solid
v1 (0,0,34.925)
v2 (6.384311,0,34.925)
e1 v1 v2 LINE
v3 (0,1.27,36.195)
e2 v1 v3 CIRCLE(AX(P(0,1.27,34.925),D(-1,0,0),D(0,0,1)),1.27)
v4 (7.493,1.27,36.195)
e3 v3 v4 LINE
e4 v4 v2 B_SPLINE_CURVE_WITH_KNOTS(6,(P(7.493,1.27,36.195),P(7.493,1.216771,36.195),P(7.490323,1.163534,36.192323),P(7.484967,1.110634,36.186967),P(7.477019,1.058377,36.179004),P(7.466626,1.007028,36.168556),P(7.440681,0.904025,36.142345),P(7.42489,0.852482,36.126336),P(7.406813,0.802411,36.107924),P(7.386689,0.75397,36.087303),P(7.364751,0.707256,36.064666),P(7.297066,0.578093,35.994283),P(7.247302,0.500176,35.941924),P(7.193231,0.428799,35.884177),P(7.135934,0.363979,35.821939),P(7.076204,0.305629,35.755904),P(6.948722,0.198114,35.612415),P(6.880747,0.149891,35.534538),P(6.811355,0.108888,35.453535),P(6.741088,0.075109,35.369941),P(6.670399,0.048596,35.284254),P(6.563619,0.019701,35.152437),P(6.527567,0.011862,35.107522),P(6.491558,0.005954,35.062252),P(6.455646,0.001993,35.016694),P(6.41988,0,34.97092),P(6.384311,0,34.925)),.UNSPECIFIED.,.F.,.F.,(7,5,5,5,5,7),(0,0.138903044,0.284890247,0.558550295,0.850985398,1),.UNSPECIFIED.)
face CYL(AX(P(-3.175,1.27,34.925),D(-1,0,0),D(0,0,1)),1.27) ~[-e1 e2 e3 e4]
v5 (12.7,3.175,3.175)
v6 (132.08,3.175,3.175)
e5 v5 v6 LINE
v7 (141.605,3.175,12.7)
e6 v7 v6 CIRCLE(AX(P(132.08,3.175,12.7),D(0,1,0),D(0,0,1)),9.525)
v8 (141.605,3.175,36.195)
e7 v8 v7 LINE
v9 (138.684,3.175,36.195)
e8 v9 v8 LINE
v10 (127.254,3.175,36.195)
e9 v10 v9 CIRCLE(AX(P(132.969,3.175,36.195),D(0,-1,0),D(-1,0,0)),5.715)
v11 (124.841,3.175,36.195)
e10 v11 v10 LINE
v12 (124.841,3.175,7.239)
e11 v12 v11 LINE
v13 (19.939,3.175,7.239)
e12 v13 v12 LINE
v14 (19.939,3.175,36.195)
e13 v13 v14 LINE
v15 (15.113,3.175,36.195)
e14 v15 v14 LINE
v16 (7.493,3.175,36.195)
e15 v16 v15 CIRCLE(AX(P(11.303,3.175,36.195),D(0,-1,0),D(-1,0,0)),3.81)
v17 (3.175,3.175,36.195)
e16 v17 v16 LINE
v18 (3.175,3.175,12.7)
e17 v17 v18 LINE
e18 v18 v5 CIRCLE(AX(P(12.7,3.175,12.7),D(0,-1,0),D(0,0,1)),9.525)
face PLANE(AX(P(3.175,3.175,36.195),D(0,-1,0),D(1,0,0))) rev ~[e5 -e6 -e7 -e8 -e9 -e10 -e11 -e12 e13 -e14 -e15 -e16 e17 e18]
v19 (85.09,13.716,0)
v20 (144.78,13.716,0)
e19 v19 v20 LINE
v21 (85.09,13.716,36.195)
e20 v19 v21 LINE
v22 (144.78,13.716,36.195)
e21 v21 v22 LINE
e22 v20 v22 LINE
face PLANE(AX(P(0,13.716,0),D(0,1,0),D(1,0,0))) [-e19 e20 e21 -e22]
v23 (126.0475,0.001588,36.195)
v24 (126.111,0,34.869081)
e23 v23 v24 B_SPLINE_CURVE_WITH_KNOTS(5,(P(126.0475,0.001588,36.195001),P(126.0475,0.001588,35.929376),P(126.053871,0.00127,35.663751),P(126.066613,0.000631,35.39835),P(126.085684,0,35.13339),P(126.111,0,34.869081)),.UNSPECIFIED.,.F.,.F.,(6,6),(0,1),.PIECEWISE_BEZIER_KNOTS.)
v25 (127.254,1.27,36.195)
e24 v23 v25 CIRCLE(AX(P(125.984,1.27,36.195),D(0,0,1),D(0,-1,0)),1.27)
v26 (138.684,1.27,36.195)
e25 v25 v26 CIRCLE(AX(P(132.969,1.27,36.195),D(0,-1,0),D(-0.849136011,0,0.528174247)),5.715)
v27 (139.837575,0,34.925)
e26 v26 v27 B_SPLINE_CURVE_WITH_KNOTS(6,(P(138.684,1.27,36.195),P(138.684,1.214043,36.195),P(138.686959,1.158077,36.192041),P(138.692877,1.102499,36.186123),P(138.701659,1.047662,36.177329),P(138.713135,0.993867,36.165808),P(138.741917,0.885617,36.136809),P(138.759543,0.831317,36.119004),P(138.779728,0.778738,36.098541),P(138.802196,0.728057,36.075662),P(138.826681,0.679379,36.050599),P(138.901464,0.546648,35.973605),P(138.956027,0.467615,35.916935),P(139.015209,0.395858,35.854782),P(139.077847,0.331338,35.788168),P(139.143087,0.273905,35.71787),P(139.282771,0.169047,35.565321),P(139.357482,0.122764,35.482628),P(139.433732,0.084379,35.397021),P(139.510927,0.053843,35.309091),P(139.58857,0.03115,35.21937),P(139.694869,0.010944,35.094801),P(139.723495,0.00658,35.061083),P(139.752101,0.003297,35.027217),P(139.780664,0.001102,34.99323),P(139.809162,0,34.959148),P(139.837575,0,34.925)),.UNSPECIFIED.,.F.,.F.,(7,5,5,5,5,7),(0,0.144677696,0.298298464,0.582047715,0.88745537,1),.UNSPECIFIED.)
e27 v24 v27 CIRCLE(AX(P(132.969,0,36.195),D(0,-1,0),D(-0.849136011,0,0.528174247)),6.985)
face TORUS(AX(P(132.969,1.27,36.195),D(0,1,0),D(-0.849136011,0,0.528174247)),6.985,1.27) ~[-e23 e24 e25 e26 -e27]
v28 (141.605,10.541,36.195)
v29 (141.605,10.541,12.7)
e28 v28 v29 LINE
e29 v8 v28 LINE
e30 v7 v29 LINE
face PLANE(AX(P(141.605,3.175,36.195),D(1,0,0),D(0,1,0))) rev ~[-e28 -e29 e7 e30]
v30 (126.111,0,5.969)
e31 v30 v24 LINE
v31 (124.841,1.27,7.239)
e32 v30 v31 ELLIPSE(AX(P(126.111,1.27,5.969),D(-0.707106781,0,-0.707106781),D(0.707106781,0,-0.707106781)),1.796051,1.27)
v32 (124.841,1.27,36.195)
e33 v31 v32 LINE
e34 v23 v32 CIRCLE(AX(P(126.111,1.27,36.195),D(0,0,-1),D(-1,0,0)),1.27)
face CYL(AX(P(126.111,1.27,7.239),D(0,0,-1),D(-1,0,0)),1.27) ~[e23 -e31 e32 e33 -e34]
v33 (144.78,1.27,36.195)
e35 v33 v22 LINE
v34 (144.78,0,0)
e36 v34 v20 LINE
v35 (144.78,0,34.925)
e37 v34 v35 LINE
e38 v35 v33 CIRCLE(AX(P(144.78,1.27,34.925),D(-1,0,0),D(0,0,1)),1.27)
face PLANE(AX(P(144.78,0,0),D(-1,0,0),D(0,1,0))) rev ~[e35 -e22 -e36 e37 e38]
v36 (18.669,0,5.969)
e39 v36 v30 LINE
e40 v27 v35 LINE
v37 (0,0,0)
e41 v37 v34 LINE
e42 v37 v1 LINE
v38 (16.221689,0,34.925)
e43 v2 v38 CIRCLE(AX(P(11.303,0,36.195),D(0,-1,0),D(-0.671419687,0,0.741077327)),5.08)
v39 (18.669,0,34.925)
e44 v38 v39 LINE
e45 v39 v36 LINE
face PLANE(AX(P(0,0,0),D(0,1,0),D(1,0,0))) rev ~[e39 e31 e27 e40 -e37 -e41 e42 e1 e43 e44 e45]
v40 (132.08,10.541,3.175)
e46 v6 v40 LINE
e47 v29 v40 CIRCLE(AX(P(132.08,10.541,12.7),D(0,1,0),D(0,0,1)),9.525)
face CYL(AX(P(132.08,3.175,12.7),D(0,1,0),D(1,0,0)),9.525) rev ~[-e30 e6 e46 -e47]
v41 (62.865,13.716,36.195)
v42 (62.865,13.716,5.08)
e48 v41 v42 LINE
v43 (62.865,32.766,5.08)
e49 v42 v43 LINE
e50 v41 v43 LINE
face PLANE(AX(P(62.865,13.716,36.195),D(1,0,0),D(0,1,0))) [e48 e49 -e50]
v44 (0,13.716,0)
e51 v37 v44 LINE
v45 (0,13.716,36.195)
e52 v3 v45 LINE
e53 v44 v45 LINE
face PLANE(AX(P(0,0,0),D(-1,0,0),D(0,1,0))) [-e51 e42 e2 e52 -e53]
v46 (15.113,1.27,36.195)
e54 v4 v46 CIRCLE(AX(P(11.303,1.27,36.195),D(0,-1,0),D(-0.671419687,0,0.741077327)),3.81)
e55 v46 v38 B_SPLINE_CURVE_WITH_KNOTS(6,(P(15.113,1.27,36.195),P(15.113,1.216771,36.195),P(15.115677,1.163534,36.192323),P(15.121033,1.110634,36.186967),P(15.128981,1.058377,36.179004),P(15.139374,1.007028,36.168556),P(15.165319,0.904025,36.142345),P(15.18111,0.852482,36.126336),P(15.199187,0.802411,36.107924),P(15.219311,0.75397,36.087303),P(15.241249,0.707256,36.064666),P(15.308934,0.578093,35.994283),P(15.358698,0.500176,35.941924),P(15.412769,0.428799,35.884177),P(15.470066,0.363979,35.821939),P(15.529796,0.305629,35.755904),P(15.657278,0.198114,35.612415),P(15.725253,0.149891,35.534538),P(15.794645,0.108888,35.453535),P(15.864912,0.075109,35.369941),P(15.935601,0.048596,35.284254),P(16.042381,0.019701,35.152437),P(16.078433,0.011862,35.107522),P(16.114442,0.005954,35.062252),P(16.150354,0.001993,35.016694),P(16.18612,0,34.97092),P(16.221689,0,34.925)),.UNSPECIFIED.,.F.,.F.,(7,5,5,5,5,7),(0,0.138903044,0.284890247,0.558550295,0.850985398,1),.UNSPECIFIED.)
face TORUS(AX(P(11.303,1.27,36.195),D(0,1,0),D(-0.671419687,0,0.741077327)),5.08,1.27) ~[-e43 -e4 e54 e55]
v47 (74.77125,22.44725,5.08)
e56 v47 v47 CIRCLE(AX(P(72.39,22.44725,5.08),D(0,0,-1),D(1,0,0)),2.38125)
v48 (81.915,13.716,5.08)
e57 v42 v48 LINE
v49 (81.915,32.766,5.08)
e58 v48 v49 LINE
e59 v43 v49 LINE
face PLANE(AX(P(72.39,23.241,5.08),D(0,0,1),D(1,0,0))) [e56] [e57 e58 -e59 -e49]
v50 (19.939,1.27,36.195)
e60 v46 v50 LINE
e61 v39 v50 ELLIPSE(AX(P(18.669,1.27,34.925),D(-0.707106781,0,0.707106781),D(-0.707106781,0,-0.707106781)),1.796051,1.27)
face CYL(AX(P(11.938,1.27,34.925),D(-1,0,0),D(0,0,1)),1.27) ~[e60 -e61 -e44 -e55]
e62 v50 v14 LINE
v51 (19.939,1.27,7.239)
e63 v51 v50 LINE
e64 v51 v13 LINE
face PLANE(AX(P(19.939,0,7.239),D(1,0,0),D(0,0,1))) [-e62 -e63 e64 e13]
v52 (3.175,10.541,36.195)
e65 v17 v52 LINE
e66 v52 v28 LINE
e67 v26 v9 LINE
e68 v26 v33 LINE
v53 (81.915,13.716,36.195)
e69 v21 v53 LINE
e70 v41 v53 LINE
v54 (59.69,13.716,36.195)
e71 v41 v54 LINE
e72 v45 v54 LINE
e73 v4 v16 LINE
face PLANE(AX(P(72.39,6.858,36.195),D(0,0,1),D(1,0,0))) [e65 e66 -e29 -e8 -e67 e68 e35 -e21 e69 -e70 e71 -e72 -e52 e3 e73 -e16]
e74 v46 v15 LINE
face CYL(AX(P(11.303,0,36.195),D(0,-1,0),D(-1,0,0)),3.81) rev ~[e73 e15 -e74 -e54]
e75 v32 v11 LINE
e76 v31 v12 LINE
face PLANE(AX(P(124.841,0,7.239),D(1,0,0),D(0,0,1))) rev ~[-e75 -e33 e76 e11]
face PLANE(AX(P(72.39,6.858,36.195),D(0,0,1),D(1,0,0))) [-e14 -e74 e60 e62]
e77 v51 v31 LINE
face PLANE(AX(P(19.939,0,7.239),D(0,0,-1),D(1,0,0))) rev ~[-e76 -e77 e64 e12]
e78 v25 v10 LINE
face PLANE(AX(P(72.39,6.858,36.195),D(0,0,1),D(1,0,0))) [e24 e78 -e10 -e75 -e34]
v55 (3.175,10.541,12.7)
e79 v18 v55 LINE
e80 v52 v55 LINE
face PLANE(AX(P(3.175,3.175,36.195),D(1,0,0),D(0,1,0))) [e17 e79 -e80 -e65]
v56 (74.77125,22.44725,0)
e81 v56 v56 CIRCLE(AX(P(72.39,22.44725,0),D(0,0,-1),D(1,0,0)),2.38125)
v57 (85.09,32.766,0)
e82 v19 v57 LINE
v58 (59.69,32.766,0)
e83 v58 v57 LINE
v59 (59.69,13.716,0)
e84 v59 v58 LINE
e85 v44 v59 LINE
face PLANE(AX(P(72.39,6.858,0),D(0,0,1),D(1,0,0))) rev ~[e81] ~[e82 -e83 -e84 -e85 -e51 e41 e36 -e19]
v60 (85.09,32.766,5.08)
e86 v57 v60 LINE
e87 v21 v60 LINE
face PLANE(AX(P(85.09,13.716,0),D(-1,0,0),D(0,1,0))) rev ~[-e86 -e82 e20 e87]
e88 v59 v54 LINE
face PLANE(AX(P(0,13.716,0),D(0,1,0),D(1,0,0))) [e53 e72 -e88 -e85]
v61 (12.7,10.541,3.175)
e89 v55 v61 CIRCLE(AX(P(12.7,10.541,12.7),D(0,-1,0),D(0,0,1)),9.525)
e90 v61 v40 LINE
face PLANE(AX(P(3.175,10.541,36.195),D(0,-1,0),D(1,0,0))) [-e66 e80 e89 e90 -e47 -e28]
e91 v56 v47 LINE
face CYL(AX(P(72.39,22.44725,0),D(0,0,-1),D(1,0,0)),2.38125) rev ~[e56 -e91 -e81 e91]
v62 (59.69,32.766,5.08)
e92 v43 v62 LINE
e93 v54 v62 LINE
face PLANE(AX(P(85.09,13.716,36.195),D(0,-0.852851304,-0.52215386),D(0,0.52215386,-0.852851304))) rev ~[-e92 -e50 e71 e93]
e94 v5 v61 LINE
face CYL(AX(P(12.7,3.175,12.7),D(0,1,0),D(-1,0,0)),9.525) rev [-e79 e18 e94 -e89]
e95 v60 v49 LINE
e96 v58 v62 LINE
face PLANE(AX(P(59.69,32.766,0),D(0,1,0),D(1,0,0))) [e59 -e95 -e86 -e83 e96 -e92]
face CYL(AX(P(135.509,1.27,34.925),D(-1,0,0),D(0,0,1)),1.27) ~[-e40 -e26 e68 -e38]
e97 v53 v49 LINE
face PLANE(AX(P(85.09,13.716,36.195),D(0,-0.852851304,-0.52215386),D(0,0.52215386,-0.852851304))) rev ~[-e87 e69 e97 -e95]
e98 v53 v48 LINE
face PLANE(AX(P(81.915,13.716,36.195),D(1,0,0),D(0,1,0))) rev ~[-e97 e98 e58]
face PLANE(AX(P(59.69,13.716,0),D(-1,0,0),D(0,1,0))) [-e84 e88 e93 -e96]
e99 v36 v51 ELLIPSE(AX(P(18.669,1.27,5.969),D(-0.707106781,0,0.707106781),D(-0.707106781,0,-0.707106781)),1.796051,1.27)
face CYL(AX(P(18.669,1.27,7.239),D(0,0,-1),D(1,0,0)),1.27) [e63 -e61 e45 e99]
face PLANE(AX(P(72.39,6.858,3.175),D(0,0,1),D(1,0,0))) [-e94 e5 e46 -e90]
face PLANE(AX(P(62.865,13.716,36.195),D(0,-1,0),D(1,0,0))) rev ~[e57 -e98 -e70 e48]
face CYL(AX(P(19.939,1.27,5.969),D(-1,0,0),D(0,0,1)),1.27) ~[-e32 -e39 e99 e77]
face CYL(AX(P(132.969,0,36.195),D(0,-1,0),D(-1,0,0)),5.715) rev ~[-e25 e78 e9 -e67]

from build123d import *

# Parameters (mm, degrees)
F0_W          = 144.78
F0_H          = 13.716
F1_DEPTH      = 36.195
F2_W          = 138.43
F2_H          = 7.366
F3_DEPTH      = 33.02
F4_W          = 104.902
F4_H          = 28.956
F5_DEPTH      = 3.175
F6_W          = 25.4
F6_H          = 19.05
F7_DEPTH      = 36.195
F8_W          = 19.05
F8_H          = 19.05
F9_DEPTH      = 31.115
F11_DEPTH     = 25.4
F12_R         = 2.38125
F13_DEPTH     = 25.4
F14_R         = 9.525
F15_T1_DEPTH  = 104.902
F15_T3_DEPTH  = 13.843
F15_T5_DEPTH  = 11.176
F15_T7_DEPTH  = 12.446
F15_T9_DEPTH  = 32.131
F15_T12_ANGLE = 243.7643577336
F15_T14_ANGLE = 275.6465366004
F15_T19_DEPTH = 108.077
F15_T23_DEPTH = 32.131
F15_T30_DEPTH = 32.131
F15_T34_DEPTH = 108.077


# Not quite as in the source:
# - a fillet or chamfer that OpenCascade refuses, or shapes differently, is made with other operations: its cross-section is extruded or revolved along the edge and cut away or added


with BuildPart() as f1:
    # F0 (on Top) → F1 (new body)
    with BuildSketch(Plane.XY):
        with Locations((72.39, 6.858)):
            Rectangle(F0_W, F0_H)
    extrude(amount=F1_DEPTH)

    # F2 (on face) → F3 (cut)
    with BuildSketch(Plane.XY.offset(36.195)):
        with Locations((72.39, 6.858)):
            Rectangle(F2_W, F2_H)
    extrude(amount=-F3_DEPTH, mode=Mode.SUBTRACT)

    # F4 (on face) → F5 (cut)
    with BuildSketch(Plane.XZ):
        with BuildLine():
            ThreePointArc((7.493, 36.195), (11.303, 32.385), (15.113, 36.195))
            Line((15.113, 36.195), (7.493, 36.195))
        make_face()
        with Locations((72.39, 21.717)):
            Rectangle(F4_W, F4_H)
        with BuildLine():
            Line((138.684, 36.195), (127.254, 36.195))
            ThreePointArc((127.254, 36.195), (132.969, 30.48), (138.684, 36.195))
        make_face()
    extrude(amount=-F5_DEPTH, mode=Mode.SUBTRACT)

    # F6 (on Top) → F7 (join)
    with BuildSketch(Plane.XY):
        with Locations((72.39, 23.241)):
            Rectangle(F6_W, F6_H)
    extrude(amount=F7_DEPTH)

    # F8 (on face) → F9 (cut)
    with BuildSketch(Plane.XY.offset(36.195)):
        with Locations((72.39, 23.241)):
            Rectangle(F8_W, F8_H)
    extrude(amount=-F9_DEPTH, mode=Mode.SUBTRACT)

    # F10 (on face) → F11 (cut)
    with BuildSketch(Plane.YZ.offset(85.09)):
        Polygon((32.766, 36.195), (13.716, 36.195), (32.766, 5.08), align=None)
    extrude(amount=-F11_DEPTH, mode=Mode.SUBTRACT)

    # F12 (on face) → F13 (cut)
    with BuildSketch(Plane(origin=(0, 0, 0), x_dir=(1, 0, 0), z_dir=(0, 0, -1))):
        with Locations((72.39, -22.44725)):
            Circle(F12_R)
    extrude(amount=-F13_DEPTH, mode=Mode.SUBTRACT)

    # F14
    f14_edges = [f1.edges().sort_by_distance(p)[0] for p in [
        (141.605, 6.858, 3.175),
        (3.175, 6.858, 3.175),
    ]]
    fillet(f14_edges, radius=F14_R)

    # F15: fillet of radius 1.27 on 9 edges, made by hand

    # F15_s2 → F15_t1 (cut)
    with BuildSketch(Plane.YZ.offset(19.939)):
        with BuildLine():
            ThreePointArc((1.27, 7.239), (0.3719743879, 6.8670256121), (0, 5.969))
            Line((0, 5.969), (0, 7.239))
            Line((0, 7.239), (1.27, 7.239))
        make_face()
    extrude(amount=F15_T1_DEPTH, mode=Mode.SUBTRACT)

    # F15_s4 → F15_t3 (cut)
    with BuildSketch(Plane.YZ.offset(-3.175)):
        with BuildLine():
            ThreePointArc((1.27, 36.195), (0.3719743879, 35.8230256121), (0, 34.925))
            Line((0, 34.925), (0, 36.195))
            Line((0, 36.195), (1.27, 36.195))
        make_face()
    extrude(amount=F15_T3_DEPTH, mode=Mode.SUBTRACT)

    # F15_s6 → F15_t5 (cut)
    with BuildSketch(Plane.YZ.offset(11.938)):
        with BuildLine():
            ThreePointArc((1.27, 36.195), (0.3719743879, 35.8230256121), (0, 34.925))
            Line((0, 34.925), (0, 36.195))
            Line((0, 36.195), (1.27, 36.195))
        make_face()
    extrude(amount=F15_T5_DEPTH, mode=Mode.SUBTRACT)

    # F15_s8 → F15_t7 (cut)
    with BuildSketch(Plane.YZ.offset(135.509)):
        with BuildLine():
            ThreePointArc((1.27, 36.195), (0.3719743879, 35.8230256121), (0, 34.925))
            Line((0, 34.925), (0, 36.195))
            Line((0, 36.195), (1.27, 36.195))
        make_face()
    extrude(amount=F15_T7_DEPTH, mode=Mode.SUBTRACT)

    # F15_s10 → F15_t9 (cut)
    with BuildSketch(Plane.XY.offset(7.239)):
        with BuildLine():
            ThreePointArc((19.939, 1.27), (19.5670256121, 0.3719743879), (18.669, 0))
            Line((18.669, 0), (19.939, 0))
            Line((19.939, 0), (19.939, 1.27))
        make_face()
        with BuildLine():
            ThreePointArc((124.841, 1.27), (125.2129743879, 0.3719743879), (126.111, 0))
            Line((126.111, 0), (124.841, 0))
            Line((124.841, 0), (124.841, 1.27))
        make_face()
    extrude(amount=F15_T9_DEPTH, mode=Mode.SUBTRACT)

    # F15_s11 → F15_t12 (revolve, cut)
    with BuildSketch(Plane(origin=(53.3272604269, 0, 85.7332545483), x_dir=(0, 1, 0), z_dir=(0.5281742472, 0, 0.8491360107))):
        with BuildLine():
            ThreePointArc((1.27, -88.0764993266), (0.3719743879, -87.7045249387), (0, -86.8064993266))
            Line((0, -86.8064993266), (0, -88.0764993266))
            Line((0, -88.0764993266), (1.27, -88.0764993266))
        make_face()
    revolve(axis=Axis((132.969, 0, 36.195), (0, -1, 0)), revolution_arc=F15_T12_ANGLE, mode=Mode.SUBTRACT)

    # F15_s13 → F15_t14 (revolve, cut)
    with BuildSketch(Plane(origin=(24.217245462, 0, 21.9409429798), x_dir=(0, 1, 0), z_dir=(0.7410773266, 0, 0.6714196869))):
        with BuildLine():
            ThreePointArc((1.27, 23.0442371148), (0.3719743879, 23.4162115027), (0, 24.3142371148))
            Line((0, 24.3142371148), (0, 23.0442371148))
            Line((0, 23.0442371148), (1.27, 23.0442371148))
        make_face()
    revolve(axis=Axis((11.303, 0, 36.195), (0, -1, 0)), revolution_arc=F15_T14_ANGLE, mode=Mode.SUBTRACT)


with BuildPart() as f15_tool17:
    # F15_s18 → F15_t19 (new body)
    with BuildSketch(Plane.YZ.offset(16.764)):
        with BuildLine():
            ThreePointArc((1.27, 7.239), (0.3719743879, 6.8670256121), (0, 5.969))
            Line((0, 5.969), (0, 7.239))
            Line((0, 7.239), (1.27, 7.239))
        make_face()
    extrude(amount=F15_T19_DEPTH)

    split(bisect_by=Plane.YZ.offset(19.939), keep=Keep.BOTTOM)


with BuildPart() as f15_tool21:
    # F15_s22 → F15_t23 (new body)
    with BuildSketch(Plane.XY.offset(36.195)):
        with BuildLine():
            ThreePointArc((19.939, 1.27), (19.5670256121, 0.3719743879), (18.669, 0))
            Line((18.669, 0), (19.939, 0))
            Line((19.939, 0), (19.939, 1.27))
        make_face()
    extrude(amount=-F15_T23_DEPTH)

    split(bisect_by=Plane.XY.offset(7.239), keep=Keep.BOTTOM)


with BuildPart() as f15_tool17_1:
    add(f15_tool17.part)

    # F15_t25: intersect F15_tool21
    add(f15_tool21.part, mode=Mode.INTERSECT)


with BuildPart() as f1_1:
    add(f1.part)

    # F15_t15: cut F15_tool17
    add(f15_tool17_1.part, mode=Mode.SUBTRACT)


with BuildPart() as f15_tool28:
    # F15_s29 → F15_t30 (new body)
    with BuildSketch(Plane.XY.offset(4.064)):
        with BuildLine():
            ThreePointArc((124.841, 1.27), (125.2129743879, 0.3719743879), (126.111, 0))
            Line((126.111, 0), (124.841, 0))
            Line((124.841, 0), (124.841, 1.27))
        make_face()
    extrude(amount=F15_T30_DEPTH)

    split(bisect_by=Plane.XY.offset(7.239), keep=Keep.BOTTOM)


with BuildPart() as f15_tool32:
    # F15_s33 → F15_t34 (new body)
    with BuildSketch(Plane.YZ.offset(19.939)):
        with BuildLine():
            ThreePointArc((1.27, 7.239), (0.3719743879, 6.8670256121), (0, 5.969))
            Line((0, 5.969), (0, 7.239))
            Line((0, 7.239), (1.27, 7.239))
        make_face()
    extrude(amount=F15_T34_DEPTH)

    split(bisect_by=Plane.YZ.offset(124.841), keep=Keep.TOP)


with BuildPart() as f15_tool28_1:
    add(f15_tool28.part)

    # F15_t36: intersect F15_tool32
    add(f15_tool32.part, mode=Mode.INTERSECT)


with BuildPart() as f1_2:
    add(f1_1.part)

    # F15_t26: cut F15_tool28
    add(f15_tool28_1.part, mode=Mode.SUBTRACT)


solid = f1_2.part
